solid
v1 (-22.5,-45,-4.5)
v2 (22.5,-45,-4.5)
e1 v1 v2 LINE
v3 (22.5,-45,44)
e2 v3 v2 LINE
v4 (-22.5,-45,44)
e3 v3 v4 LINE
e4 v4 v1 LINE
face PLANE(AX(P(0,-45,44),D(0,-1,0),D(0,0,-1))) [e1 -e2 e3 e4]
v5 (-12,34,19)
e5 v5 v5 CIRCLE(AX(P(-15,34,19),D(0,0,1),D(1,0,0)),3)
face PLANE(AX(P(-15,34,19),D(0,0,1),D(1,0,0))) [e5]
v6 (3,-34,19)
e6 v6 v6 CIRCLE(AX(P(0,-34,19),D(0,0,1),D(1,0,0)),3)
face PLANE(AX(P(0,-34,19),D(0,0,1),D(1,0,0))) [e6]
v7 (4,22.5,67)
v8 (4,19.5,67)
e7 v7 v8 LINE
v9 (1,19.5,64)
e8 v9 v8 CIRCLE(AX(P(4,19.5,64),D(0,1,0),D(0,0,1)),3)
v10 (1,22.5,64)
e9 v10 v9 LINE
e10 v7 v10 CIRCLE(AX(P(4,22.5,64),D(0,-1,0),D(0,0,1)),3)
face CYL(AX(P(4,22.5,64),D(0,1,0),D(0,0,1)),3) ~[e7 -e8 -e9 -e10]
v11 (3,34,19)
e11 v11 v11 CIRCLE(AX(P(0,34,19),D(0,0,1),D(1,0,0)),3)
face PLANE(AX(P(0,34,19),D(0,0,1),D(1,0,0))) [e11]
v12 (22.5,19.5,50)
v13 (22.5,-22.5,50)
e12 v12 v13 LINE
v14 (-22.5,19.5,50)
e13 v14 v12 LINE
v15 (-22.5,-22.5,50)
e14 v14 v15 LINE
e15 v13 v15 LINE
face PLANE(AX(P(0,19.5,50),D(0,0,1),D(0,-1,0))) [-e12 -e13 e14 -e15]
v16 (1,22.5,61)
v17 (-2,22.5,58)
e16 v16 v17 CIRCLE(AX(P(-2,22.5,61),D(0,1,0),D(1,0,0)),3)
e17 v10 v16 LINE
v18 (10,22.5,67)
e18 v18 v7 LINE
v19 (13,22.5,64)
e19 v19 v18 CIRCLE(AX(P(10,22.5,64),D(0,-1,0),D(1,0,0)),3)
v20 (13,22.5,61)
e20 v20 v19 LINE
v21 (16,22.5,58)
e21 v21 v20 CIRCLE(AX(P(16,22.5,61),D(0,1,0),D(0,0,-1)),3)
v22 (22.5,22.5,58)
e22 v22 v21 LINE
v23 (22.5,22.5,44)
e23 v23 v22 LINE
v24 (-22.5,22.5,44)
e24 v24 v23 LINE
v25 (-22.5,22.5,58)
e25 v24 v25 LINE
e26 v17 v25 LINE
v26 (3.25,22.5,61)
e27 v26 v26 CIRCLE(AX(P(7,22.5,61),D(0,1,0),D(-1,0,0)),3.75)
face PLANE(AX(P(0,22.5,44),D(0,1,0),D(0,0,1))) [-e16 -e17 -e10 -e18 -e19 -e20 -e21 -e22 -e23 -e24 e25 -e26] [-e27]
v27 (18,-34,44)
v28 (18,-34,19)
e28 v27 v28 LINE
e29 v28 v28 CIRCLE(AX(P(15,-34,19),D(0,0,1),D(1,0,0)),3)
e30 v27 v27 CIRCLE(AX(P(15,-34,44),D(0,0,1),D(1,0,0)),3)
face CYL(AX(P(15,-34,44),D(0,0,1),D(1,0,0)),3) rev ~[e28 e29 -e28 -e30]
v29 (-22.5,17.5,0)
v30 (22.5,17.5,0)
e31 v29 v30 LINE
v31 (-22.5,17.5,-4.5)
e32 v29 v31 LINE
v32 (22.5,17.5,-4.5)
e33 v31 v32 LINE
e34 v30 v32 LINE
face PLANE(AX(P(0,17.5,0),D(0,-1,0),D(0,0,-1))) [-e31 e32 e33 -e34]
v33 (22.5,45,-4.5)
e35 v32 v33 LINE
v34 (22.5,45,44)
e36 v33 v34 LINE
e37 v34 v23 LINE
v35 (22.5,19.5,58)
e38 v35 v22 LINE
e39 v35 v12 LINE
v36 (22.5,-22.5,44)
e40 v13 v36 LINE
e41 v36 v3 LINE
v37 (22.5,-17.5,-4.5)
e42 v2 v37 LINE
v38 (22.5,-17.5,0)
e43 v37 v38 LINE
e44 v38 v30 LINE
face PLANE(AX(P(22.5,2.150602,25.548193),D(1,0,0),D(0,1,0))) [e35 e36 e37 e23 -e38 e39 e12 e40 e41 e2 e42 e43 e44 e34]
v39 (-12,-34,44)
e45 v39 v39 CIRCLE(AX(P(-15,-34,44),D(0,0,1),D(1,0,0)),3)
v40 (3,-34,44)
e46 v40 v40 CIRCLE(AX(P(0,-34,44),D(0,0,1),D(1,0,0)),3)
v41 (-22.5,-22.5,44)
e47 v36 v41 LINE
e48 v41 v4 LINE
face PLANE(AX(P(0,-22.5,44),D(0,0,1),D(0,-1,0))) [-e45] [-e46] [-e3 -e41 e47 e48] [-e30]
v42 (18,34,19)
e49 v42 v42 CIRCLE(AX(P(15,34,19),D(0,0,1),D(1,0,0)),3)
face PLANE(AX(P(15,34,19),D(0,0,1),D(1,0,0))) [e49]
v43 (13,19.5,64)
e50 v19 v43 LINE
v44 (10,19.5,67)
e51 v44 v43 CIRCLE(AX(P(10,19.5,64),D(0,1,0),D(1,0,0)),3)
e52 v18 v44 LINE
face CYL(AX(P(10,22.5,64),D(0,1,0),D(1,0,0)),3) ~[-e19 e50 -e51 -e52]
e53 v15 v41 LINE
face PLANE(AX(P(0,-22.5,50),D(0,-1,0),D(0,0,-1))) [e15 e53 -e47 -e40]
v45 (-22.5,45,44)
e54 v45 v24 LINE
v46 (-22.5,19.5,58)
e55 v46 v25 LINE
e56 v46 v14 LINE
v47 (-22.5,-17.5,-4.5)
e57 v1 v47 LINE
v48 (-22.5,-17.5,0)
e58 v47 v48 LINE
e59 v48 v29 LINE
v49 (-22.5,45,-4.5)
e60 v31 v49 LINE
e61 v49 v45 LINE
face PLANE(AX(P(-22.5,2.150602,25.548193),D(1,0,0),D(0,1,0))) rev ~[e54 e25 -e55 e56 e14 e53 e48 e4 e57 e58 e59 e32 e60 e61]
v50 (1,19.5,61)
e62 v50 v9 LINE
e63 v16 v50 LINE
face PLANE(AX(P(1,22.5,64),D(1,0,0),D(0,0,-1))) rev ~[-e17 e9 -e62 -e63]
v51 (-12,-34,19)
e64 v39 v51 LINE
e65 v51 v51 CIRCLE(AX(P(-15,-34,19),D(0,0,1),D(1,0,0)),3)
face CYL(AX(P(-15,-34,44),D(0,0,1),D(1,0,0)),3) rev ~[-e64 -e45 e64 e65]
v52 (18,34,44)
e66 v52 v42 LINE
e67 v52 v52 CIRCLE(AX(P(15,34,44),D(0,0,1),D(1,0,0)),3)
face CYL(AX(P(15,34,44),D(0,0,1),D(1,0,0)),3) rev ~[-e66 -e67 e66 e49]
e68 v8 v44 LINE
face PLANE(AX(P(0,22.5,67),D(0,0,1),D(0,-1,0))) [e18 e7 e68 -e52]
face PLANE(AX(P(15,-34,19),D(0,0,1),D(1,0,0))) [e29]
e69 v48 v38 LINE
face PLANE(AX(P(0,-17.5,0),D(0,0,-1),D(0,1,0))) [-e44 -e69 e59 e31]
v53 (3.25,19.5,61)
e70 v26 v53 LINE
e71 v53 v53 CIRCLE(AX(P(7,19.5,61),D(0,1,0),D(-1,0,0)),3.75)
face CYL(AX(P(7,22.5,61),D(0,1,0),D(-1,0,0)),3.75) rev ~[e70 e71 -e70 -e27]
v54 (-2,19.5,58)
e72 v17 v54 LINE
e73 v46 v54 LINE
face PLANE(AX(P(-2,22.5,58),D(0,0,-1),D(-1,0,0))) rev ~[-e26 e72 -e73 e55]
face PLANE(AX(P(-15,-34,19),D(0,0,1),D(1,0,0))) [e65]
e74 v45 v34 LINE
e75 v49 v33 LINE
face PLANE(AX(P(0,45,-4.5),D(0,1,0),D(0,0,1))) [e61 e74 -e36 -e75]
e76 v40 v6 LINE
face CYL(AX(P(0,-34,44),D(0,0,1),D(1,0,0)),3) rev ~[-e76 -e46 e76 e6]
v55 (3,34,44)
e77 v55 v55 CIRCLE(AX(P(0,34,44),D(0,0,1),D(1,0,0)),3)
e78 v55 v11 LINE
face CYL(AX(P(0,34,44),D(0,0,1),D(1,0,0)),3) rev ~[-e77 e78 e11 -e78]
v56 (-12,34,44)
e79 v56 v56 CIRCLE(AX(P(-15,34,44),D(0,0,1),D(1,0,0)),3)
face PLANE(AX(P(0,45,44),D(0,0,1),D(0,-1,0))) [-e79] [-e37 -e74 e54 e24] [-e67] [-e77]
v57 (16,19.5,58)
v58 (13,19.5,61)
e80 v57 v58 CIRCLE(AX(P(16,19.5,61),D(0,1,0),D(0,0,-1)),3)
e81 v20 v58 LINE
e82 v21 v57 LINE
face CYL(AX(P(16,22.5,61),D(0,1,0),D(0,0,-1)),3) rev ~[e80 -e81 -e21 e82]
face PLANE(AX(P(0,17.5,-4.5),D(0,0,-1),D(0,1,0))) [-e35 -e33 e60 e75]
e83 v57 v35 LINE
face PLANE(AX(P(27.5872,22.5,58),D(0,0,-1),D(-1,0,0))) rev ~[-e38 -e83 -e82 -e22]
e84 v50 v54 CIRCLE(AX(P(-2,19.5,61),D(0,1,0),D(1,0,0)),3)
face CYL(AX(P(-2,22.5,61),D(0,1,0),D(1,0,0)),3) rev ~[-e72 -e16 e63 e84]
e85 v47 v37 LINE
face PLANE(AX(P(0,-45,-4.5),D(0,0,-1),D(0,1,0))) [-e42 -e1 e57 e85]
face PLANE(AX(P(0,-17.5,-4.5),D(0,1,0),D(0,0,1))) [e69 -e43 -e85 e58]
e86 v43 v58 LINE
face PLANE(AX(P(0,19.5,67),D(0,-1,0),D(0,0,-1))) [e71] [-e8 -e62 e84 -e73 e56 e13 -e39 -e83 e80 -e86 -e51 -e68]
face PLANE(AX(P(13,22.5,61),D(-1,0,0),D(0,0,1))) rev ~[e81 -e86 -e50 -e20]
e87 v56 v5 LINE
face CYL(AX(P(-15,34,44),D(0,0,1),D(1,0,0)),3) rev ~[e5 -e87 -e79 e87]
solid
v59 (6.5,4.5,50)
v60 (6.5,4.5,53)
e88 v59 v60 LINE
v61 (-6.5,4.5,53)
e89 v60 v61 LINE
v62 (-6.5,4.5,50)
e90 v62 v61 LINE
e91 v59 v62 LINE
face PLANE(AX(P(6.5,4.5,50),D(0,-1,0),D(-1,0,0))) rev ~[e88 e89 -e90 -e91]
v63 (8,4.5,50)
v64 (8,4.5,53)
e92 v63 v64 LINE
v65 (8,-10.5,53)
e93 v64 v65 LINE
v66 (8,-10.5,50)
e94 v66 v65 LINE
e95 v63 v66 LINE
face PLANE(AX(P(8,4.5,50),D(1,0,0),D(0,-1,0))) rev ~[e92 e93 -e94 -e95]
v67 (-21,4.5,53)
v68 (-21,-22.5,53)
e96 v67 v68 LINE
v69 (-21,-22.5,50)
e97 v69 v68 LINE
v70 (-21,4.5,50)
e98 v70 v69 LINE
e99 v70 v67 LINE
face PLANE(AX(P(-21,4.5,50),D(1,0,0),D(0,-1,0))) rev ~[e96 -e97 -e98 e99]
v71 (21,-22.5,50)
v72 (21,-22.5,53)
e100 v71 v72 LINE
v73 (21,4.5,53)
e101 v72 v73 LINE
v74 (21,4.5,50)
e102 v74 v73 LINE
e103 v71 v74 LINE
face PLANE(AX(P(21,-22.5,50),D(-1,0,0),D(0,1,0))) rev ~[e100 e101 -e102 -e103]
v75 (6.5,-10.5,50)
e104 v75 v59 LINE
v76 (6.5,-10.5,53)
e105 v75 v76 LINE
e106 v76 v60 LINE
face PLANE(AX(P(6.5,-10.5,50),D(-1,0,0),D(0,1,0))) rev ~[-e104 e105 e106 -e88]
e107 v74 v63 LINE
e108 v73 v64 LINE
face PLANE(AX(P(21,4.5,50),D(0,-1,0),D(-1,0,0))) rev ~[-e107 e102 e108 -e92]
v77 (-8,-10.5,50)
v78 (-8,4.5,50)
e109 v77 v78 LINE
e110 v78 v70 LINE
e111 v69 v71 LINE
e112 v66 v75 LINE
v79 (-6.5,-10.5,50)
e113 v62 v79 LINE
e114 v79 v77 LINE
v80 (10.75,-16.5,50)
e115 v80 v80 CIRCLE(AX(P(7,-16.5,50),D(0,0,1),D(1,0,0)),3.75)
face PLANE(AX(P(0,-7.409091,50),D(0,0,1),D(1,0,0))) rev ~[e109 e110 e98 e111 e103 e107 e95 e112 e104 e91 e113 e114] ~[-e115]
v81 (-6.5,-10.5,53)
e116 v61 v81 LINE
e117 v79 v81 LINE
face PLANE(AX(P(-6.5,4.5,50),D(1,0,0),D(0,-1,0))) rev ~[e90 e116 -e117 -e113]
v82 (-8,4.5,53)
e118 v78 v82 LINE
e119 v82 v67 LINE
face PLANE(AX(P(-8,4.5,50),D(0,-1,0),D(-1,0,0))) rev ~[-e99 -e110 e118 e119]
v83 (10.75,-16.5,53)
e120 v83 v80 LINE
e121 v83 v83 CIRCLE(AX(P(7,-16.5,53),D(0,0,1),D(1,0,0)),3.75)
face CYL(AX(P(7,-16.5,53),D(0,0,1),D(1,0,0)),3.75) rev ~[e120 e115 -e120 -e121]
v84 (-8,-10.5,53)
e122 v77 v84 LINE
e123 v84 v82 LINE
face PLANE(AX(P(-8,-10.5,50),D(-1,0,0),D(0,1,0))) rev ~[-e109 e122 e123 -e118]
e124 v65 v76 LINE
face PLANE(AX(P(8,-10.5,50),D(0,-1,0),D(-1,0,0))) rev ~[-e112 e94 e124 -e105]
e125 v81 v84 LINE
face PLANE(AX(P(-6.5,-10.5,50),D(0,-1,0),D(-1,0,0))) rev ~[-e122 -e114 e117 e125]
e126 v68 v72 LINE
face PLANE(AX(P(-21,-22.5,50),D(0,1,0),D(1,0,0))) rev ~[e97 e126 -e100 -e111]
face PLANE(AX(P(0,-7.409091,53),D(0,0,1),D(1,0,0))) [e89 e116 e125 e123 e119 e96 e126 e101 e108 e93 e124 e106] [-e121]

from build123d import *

# Parameters (mm, degrees)
F1_DEPTH = 22.5
F2_R     = 3.75
F3_DEPTH = 25
F5_DEPTH = 3
F6_R     = 3
F7_DEPTH = 25
F8_R     = 3.75
F9_DEPTH = 25


with BuildPart() as f1:
    # F0 (on Right) → F1 (new body, symmetric)
    with BuildSketch(Plane.YZ):
        Polygon((-45, 44), (-45, -4.5), (-17.5, -4.5), (-17.5, 0), (17.5, 0), (17.5, -4.5), (45, -4.5), (45, 44), (22.5, 44), (22.5, 67), (19.5, 67), (19.5, 50), (-22.5, 50), (-22.5, 44), align=None)
    extrude(amount=F1_DEPTH, both=True)

    # F2 (on face) → F3 (cut)
    with BuildSketch(Plane(origin=(0, 22.5, 0), x_dir=(-1, 0, 0), z_dir=(0, 1, 0))):
        with Locations((-7, 61)):
            Circle(F2_R)
        with BuildLine():
            Line((-13, 61), (-13, 64))
            ThreePointArc((-13, 64), (-12.1213203436, 66.1213203436), (-10, 67))
            Line((-10, 67), (-4, 67))
            ThreePointArc((-4, 67), (-1.8786796564, 66.1213203436), (-1, 64))
            Line((-1, 64), (-1, 61))
            ThreePointArc((-1, 61), (-0.1213203436, 58.8786796564), (2, 58))
            Line((2, 58), (22.5, 58))
            Line((22.5, 58), (37.2377703208, 58))
            Line((37.2377703208, 58), (37.2377703208, 73.085991472))
            Line((37.2377703208, 73.085991472), (-27.5872001182, 73.085991472))
            Line((-27.5872001182, 73.085991472), (-27.5872001182, 58))
            Line((-27.5872001182, 58), (-22.5, 58))
            Line((-22.5, 58), (-16, 58))
            ThreePointArc((-16, 58), (-13.8786796564, 58.8786796564), (-13, 61))
        make_face()
    extrude(amount=-F3_DEPTH, mode=Mode.SUBTRACT)

    # F6 (on face) → F7 (cut)
    with BuildSketch(Plane.XY.offset(44)):
        with Locations((15, -34)):
            Circle(F6_R)
        with Locations((-15, -34)):
            Circle(F6_R)
        with Locations((0, -34)):
            Circle(F6_R)
        with Locations((-15, 34)):
            Circle(F6_R)
        with Locations((0, 34)):
            Circle(F6_R)
        with Locations((15, 34)):
            Circle(F6_R)
    extrude(amount=-F7_DEPTH, mode=Mode.SUBTRACT)


with BuildPart() as f5:
    # F4 (on face) → F5 (new body)
    with BuildSketch(Plane.XY.offset(50)):
        Polygon((-21, -22.5), (21, -22.5), (21, 4.5), (8, 4.5), (8, -10.5), (6.5, -10.5), (6.5, 4.5), (-6.5, 4.5), (-6.5, -10.5), (-8, -10.5), (-8, 4.5), (-21, 4.5), align=None)
    extrude(amount=F5_DEPTH)

    # F8 (on face) → F9 (cut)
    with BuildSketch(Plane.XY.offset(53)):
        with Locations((7, -16.5)):
            Circle(F8_R)
    extrude(amount=-F9_DEPTH, mode=Mode.SUBTRACT)


solid = Compound([f1.part, f5.part])
